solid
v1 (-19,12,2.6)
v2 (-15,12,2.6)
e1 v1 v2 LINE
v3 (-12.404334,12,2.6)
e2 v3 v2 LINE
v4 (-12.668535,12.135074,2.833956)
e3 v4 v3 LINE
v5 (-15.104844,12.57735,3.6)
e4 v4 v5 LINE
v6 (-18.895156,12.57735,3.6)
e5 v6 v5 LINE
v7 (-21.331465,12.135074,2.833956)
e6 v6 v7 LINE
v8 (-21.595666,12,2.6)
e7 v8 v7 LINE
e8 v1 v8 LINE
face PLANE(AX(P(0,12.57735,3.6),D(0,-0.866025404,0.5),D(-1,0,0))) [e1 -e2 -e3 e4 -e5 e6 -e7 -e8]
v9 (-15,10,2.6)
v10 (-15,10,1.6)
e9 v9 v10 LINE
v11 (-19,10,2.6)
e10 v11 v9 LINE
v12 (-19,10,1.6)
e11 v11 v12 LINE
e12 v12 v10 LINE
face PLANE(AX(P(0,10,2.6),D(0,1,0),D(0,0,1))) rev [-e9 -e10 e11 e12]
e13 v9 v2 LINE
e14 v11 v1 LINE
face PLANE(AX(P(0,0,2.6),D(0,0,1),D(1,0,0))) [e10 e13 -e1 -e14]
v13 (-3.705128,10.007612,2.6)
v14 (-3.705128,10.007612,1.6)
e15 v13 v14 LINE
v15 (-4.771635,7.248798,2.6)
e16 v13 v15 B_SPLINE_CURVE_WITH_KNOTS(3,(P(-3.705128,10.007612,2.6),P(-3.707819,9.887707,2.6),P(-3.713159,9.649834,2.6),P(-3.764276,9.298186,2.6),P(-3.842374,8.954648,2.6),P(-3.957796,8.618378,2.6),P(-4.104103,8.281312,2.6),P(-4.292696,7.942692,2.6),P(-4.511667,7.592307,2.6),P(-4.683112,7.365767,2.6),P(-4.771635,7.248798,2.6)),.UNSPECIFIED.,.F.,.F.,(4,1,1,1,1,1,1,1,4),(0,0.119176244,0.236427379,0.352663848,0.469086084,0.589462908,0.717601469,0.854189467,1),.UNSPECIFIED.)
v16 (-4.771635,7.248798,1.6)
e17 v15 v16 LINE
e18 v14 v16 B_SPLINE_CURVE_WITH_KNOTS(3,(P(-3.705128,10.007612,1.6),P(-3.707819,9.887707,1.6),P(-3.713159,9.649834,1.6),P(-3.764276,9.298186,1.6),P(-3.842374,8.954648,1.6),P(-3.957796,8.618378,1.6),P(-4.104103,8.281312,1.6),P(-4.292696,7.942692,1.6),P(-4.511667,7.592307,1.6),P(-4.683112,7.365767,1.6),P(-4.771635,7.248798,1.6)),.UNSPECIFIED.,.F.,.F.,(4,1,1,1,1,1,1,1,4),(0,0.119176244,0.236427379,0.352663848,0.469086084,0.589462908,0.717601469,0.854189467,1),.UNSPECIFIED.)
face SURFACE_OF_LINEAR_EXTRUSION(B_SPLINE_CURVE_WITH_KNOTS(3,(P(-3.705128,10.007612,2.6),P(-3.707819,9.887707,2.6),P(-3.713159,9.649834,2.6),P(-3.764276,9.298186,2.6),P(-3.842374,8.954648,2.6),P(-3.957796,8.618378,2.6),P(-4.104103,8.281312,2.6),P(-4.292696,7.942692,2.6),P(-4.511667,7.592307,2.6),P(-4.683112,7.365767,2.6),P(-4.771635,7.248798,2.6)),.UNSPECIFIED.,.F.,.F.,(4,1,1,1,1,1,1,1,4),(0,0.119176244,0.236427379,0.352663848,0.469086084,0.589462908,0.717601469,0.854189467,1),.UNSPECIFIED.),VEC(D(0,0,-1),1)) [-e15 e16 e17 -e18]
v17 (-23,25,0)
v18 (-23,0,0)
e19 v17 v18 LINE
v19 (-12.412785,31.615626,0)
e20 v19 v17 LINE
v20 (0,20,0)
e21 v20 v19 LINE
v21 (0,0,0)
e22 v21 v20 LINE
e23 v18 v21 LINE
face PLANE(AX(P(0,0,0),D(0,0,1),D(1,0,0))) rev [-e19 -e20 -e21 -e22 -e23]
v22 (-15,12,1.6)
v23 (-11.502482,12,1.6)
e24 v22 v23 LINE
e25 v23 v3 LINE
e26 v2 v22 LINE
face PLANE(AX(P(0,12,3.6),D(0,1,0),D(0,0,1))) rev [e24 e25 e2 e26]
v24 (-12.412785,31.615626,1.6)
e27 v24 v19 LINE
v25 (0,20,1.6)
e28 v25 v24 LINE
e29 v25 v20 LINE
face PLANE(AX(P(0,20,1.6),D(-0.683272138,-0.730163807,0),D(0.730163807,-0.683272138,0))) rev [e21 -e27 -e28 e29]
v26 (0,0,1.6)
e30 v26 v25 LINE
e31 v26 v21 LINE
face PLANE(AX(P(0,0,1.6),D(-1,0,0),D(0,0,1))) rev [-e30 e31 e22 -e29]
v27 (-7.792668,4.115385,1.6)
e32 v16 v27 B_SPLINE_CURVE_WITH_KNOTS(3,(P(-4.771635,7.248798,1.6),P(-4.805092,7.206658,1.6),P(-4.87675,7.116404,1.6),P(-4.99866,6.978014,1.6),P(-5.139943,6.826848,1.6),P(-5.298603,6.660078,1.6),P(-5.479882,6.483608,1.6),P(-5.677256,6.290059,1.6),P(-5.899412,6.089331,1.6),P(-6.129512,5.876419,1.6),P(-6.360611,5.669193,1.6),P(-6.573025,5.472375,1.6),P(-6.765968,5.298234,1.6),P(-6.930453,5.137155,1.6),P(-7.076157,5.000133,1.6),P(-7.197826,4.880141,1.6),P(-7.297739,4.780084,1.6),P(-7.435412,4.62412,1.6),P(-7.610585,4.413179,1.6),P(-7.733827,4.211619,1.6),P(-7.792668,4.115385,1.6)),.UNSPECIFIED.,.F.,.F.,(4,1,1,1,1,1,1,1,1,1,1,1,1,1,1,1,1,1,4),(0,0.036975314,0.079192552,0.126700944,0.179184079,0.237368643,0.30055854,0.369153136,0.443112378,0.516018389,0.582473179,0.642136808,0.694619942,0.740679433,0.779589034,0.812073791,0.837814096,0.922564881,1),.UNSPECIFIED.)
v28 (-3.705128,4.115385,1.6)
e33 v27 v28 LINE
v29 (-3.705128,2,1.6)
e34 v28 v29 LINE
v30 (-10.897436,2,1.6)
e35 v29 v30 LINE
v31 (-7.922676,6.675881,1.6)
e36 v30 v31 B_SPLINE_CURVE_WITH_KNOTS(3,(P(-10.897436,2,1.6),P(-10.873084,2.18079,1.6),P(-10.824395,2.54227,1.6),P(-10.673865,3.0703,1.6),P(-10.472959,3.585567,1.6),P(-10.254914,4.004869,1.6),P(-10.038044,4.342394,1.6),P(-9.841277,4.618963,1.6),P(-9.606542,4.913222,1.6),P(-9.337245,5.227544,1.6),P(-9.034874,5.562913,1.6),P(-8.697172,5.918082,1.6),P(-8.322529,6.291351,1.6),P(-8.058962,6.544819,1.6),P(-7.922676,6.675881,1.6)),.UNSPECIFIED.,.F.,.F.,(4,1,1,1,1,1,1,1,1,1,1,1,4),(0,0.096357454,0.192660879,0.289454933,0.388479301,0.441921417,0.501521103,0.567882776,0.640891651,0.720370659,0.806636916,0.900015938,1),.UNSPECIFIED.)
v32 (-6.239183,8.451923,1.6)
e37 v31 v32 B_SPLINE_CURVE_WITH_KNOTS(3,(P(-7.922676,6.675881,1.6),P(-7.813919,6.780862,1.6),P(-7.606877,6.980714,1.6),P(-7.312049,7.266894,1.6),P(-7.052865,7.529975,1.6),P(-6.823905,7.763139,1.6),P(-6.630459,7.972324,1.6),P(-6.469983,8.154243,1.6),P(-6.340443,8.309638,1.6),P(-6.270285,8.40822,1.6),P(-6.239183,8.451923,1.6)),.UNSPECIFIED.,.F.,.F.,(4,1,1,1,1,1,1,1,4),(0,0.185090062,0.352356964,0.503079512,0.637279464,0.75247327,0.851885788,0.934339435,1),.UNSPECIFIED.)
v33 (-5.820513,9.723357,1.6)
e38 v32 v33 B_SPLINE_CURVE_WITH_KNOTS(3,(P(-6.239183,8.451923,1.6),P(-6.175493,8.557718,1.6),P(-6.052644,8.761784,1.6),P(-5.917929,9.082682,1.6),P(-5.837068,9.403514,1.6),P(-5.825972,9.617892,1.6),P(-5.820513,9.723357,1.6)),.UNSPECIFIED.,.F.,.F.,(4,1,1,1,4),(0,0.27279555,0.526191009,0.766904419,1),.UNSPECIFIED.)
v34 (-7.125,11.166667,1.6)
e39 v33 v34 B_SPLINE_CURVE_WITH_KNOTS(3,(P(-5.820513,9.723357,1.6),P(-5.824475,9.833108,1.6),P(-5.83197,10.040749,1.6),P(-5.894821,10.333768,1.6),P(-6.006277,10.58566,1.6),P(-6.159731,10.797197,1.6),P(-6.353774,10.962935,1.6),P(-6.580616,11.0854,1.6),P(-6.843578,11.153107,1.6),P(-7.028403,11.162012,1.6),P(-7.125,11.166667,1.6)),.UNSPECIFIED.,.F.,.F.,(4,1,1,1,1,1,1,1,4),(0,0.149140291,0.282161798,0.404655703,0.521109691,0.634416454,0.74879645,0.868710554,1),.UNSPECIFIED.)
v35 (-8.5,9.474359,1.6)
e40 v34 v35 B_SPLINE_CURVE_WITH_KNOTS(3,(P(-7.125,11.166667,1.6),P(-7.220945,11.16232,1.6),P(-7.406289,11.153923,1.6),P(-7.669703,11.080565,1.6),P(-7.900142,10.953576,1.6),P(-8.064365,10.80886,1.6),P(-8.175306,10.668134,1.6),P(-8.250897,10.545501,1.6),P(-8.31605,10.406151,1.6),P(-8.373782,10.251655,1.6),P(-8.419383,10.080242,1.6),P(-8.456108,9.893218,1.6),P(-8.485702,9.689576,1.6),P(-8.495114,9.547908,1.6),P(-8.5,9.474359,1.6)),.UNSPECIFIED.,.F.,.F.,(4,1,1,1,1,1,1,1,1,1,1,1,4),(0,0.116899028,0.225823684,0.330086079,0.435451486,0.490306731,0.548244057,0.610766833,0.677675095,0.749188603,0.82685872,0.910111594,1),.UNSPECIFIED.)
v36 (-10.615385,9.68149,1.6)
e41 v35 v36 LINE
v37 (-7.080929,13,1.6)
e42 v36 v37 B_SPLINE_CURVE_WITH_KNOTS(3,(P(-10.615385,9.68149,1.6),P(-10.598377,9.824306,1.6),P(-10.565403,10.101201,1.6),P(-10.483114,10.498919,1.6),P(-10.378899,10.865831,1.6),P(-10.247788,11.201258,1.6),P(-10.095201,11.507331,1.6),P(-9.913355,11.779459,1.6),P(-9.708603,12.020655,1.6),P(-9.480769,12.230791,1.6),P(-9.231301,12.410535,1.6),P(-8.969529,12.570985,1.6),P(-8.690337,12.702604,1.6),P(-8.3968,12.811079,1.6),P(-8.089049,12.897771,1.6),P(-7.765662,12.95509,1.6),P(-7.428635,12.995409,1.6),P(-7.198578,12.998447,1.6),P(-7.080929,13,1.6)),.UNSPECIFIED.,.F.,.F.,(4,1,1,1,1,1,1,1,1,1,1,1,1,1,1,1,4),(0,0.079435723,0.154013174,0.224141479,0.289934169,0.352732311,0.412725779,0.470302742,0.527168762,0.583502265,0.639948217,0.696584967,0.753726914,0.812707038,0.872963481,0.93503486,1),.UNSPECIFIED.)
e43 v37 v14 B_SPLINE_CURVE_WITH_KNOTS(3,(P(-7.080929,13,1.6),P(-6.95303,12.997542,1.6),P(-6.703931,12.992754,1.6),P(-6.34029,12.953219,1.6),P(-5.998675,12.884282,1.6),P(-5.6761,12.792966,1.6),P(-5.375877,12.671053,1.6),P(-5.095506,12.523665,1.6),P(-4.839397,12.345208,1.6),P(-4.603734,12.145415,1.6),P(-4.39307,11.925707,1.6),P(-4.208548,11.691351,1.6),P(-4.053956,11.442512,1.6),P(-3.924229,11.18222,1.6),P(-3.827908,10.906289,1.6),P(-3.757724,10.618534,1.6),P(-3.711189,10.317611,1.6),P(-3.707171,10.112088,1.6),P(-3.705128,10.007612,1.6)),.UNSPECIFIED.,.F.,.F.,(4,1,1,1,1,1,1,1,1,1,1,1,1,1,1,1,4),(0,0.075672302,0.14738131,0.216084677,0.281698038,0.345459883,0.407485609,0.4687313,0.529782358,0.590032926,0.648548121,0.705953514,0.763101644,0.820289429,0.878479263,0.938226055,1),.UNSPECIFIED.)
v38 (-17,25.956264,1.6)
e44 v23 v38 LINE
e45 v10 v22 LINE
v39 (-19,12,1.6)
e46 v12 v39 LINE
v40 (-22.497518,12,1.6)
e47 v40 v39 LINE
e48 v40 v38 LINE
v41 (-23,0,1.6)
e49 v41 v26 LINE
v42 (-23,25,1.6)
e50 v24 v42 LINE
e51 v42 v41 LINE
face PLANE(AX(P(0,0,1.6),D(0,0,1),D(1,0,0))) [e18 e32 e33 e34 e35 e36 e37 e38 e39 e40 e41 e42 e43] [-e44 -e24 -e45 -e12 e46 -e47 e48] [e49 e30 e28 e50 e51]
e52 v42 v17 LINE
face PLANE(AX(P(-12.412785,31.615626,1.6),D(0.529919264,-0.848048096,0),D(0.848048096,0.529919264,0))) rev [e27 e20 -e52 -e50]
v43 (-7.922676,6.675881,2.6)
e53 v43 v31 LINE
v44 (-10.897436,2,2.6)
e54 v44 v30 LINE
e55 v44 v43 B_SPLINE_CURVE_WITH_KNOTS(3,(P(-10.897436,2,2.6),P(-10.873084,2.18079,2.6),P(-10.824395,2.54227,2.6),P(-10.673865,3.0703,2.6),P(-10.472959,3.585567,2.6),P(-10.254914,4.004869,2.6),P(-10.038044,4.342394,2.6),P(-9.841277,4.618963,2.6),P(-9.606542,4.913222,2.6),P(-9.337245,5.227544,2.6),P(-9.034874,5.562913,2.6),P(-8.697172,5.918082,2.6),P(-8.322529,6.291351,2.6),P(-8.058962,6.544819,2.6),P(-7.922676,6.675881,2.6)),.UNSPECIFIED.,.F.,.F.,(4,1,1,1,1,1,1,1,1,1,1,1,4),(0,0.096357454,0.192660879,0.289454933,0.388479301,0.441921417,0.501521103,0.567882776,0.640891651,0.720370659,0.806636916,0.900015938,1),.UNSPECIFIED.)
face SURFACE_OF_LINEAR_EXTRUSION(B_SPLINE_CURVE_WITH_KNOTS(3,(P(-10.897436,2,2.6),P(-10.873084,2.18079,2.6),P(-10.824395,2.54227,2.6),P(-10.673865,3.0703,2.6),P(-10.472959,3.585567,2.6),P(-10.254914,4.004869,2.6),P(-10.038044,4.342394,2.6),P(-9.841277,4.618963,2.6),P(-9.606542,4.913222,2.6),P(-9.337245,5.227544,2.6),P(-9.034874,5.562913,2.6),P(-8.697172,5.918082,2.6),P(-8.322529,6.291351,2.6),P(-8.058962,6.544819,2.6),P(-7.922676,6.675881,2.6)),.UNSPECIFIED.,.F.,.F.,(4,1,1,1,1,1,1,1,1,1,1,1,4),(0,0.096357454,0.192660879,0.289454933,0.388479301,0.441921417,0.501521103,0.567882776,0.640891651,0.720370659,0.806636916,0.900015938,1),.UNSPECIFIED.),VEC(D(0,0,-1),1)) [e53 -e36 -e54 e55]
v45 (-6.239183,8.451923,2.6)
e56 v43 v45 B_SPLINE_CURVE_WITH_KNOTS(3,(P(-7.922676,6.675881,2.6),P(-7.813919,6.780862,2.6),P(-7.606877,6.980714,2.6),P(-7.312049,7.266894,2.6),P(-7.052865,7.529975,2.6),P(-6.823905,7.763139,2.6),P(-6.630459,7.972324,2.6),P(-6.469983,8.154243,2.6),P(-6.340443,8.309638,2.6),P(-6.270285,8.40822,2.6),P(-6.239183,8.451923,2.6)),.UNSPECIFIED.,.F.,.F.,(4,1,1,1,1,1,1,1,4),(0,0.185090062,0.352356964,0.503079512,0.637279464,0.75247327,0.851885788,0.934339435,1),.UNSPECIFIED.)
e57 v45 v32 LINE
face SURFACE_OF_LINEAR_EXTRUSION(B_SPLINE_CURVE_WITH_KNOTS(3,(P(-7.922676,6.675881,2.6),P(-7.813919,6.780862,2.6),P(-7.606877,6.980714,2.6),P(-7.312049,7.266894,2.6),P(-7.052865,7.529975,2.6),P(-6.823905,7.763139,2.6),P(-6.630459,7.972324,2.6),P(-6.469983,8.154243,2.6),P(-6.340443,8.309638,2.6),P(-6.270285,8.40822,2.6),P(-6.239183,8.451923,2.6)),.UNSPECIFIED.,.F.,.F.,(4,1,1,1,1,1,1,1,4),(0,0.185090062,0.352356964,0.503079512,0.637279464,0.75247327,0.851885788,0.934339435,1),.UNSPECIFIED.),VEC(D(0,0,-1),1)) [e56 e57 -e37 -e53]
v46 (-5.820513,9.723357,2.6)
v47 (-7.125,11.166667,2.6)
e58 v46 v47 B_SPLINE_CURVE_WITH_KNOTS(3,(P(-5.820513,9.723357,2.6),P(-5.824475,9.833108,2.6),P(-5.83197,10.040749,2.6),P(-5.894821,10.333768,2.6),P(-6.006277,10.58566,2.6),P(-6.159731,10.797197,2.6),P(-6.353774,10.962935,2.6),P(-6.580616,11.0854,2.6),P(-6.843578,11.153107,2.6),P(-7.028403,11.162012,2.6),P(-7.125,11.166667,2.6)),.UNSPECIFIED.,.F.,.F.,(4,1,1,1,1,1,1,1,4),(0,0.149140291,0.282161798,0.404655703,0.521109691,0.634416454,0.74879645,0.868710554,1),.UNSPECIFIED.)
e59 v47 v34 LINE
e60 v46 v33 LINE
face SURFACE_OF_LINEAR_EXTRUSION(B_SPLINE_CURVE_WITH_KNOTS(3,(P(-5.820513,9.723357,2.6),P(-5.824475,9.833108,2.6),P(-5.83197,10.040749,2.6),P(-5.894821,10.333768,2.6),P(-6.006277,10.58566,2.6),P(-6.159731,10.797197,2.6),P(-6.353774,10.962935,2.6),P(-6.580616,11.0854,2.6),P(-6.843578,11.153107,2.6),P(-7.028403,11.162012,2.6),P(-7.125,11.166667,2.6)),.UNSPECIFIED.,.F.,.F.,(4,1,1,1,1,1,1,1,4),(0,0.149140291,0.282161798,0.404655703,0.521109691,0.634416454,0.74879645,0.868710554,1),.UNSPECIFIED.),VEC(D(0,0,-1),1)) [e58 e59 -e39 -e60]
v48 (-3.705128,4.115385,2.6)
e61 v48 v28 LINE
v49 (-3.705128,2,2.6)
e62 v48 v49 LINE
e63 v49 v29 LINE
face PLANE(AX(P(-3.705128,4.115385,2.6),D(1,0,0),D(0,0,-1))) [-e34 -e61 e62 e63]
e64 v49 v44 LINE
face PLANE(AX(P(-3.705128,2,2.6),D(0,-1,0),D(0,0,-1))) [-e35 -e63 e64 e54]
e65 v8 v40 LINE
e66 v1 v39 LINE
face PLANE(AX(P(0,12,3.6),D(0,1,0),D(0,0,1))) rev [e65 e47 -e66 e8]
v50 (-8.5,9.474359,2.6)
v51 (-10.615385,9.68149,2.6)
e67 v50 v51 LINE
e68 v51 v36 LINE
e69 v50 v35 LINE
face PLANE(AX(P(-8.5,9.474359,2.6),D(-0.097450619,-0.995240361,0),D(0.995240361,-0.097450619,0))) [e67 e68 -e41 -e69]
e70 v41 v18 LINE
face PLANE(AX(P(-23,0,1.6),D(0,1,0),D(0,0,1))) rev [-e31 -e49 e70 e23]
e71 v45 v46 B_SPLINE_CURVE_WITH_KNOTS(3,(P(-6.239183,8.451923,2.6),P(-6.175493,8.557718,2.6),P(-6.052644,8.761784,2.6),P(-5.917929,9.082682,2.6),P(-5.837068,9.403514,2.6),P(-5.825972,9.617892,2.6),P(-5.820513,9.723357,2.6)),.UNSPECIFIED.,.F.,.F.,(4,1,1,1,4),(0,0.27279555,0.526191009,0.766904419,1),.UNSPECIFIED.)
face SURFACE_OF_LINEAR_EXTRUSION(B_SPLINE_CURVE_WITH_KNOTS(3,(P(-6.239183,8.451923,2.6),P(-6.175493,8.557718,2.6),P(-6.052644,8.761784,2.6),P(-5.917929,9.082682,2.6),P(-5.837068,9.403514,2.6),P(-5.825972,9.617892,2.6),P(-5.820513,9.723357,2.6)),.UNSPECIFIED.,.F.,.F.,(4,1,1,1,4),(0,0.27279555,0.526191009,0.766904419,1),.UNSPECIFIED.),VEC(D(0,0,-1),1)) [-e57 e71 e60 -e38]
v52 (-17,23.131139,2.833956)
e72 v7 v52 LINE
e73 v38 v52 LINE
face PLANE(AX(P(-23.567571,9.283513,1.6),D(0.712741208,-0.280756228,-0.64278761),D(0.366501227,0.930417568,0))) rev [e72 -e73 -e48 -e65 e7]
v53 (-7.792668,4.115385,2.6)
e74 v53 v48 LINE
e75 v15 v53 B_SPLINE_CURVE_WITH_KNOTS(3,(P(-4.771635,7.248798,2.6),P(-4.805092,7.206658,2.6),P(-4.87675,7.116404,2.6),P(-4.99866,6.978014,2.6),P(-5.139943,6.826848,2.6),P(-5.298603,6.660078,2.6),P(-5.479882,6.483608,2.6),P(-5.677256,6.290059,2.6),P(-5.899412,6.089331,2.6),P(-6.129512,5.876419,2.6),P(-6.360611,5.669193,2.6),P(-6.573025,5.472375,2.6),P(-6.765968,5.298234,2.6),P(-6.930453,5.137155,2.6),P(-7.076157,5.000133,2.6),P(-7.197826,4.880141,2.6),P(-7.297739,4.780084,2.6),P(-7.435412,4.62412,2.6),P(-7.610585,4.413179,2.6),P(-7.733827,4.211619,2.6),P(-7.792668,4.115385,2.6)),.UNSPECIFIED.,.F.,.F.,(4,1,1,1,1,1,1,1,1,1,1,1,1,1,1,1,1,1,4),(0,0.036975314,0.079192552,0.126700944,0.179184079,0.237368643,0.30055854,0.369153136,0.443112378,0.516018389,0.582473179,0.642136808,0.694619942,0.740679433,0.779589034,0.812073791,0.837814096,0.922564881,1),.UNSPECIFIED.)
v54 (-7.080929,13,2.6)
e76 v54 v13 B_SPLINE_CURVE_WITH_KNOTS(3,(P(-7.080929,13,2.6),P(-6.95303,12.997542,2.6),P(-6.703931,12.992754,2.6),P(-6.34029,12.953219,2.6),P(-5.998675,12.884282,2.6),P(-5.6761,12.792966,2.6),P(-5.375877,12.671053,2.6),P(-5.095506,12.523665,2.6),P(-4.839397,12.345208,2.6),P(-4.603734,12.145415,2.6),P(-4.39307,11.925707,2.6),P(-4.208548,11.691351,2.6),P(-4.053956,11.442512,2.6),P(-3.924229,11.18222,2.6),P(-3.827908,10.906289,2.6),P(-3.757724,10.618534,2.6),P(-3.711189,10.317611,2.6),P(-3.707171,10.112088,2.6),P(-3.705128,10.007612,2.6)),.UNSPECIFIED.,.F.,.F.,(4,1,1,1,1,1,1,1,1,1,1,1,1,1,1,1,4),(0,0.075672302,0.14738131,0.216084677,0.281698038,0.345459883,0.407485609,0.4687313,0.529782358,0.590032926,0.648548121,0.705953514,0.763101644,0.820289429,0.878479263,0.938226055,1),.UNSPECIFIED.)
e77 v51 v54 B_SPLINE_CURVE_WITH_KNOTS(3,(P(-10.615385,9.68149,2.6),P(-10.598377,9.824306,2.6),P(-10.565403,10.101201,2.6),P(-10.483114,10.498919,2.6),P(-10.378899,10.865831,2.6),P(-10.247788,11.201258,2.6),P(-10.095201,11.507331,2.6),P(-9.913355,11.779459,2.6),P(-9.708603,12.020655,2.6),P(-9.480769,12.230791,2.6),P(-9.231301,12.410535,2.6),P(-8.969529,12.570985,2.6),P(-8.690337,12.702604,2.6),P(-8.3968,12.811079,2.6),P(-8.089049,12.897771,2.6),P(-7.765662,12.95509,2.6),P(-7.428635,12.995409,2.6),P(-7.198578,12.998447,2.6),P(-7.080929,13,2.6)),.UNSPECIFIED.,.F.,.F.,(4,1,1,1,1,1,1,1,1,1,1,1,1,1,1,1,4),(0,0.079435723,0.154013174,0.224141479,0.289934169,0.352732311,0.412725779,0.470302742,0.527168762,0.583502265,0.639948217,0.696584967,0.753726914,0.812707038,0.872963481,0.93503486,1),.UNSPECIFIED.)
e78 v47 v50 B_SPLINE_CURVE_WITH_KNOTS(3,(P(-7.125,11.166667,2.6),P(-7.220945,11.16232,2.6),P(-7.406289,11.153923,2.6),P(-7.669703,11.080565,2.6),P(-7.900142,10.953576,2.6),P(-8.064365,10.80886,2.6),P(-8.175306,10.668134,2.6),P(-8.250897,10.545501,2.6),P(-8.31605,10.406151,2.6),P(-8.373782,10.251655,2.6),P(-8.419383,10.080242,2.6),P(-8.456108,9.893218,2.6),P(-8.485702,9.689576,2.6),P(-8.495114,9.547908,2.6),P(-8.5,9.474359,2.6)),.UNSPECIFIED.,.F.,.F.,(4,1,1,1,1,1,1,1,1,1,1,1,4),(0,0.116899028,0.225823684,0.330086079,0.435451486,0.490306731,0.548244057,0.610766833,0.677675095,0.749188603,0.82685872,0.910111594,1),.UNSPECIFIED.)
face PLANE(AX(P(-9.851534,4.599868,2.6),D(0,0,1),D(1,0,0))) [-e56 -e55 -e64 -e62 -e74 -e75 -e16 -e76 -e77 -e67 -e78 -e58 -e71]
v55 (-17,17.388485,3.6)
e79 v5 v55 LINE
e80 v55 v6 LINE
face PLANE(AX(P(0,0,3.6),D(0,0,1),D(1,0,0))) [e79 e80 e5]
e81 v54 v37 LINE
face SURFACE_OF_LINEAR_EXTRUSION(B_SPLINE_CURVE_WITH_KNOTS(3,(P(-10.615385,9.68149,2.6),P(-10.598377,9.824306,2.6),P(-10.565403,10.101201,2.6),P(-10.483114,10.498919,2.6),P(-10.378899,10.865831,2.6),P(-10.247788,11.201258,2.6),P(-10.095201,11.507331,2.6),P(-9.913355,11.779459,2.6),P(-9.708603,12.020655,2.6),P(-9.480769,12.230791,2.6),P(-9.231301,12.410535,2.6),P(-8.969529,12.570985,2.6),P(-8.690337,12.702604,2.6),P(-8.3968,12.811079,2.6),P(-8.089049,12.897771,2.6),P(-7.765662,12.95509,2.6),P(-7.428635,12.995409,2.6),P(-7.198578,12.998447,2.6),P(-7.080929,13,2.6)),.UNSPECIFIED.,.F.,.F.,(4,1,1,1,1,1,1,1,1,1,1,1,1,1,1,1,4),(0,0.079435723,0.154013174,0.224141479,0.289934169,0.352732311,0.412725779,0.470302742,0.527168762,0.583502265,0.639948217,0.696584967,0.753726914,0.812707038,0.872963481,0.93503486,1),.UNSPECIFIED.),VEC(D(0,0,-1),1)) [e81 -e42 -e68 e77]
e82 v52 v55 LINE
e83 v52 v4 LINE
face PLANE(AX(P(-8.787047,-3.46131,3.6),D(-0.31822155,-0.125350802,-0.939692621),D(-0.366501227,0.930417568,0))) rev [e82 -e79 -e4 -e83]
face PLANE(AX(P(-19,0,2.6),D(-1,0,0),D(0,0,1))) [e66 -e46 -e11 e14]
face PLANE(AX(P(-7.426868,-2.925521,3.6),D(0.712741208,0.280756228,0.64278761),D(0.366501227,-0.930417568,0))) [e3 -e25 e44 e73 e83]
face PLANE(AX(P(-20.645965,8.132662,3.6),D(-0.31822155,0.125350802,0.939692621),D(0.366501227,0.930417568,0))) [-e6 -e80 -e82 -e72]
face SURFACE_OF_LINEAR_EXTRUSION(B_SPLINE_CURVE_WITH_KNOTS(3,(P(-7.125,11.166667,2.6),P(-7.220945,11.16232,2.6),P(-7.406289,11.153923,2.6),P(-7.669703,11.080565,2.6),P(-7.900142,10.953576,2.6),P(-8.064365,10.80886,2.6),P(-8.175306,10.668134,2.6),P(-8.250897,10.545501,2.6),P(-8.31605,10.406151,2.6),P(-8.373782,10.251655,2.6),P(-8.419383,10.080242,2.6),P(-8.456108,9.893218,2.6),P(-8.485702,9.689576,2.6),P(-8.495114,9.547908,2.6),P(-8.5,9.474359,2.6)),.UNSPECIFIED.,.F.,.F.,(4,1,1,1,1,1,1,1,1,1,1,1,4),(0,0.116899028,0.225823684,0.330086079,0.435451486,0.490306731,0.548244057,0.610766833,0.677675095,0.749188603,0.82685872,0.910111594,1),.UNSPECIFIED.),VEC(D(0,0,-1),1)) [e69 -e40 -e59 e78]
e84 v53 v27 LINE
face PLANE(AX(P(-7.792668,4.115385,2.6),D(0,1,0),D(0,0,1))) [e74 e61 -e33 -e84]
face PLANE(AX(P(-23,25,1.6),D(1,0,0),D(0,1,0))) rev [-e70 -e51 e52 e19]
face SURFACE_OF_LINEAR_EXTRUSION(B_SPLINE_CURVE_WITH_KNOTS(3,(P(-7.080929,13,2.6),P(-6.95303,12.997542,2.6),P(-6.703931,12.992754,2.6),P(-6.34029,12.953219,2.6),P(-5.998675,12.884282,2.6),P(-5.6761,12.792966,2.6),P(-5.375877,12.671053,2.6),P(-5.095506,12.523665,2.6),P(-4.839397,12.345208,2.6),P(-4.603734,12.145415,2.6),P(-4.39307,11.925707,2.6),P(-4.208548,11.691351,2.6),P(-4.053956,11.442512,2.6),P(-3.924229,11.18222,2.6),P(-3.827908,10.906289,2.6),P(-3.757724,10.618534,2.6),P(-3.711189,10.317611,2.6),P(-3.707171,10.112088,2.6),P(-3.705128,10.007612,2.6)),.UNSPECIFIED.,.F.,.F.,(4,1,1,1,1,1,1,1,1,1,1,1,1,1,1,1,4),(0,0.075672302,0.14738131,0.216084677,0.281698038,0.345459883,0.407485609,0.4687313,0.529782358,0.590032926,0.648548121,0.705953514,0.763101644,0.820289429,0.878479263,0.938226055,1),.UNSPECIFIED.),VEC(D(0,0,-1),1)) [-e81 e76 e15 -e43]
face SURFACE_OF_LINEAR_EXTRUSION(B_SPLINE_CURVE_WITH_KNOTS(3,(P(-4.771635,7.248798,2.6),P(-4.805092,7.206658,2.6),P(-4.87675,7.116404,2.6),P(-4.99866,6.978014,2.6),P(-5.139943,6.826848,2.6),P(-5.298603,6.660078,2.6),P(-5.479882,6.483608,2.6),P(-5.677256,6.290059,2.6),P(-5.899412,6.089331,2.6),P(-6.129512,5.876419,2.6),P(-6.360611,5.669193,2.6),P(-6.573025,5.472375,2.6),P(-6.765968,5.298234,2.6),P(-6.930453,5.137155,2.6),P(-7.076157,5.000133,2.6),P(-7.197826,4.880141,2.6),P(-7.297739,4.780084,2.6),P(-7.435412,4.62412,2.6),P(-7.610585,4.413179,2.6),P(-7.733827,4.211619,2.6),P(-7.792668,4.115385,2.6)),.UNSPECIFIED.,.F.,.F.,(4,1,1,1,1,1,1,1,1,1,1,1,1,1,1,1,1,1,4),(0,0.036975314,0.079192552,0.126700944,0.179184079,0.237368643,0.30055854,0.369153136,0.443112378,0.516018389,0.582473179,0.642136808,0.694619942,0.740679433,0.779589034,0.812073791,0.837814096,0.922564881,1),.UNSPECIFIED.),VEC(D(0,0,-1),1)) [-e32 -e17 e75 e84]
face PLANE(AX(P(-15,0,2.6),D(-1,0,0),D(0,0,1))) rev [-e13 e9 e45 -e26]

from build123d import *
from OCP.BRepFilletAPI import BRepFilletAPI_MakeChamfer

# Parameters (mm, degrees)
P_IDAT_VYSUNUT_M5_DEPTH = 1.6
P_IDAT_VYSUNUT_M6_DEPTH = 2
SKICA2_7_W              = 2
SKICA2_7_H              = 2
P_IDAT_VYSUNUT_M7_DEPTH = 1
P_IDAT_VYSUNUT_M8_DEPTH = 1
ZKOSEN_5_SIZE2          = 1.678199262
ZKOSEN_5_SIZE           = 2
ZKOSEN_8_SIZE2          = 2
ZKOSEN_8_SIZE           = 1.678199262
ZKOSEN_12_SIZE          = 1.461883237
ZKOSEN_12_SIZE_2        = 1
ZKOSEN_12_SIZE_3        = 0.577350269


with BuildPart() as part:
    # Skica1 → Přidat vysunutím5 (new body)
    with BuildSketch(Plane.XY):
        Polygon((0, 0), (0, 20), (-12.412784718, 31.615626352), (-23, 25), (-23, 0), align=None)
    extrude(amount=P_IDAT_VYSUNUT_M5_DEPTH)

    # Skica2 → Přidat vysunutím6 (add)
    with BuildSketch(Plane.XY.offset(1.6)):
        Polygon((-17, 25.95626352), (-17, 12), (-15, 12), (-11.502481599, 12), align=None)
        Polygon((-22.497518401, 12), (-19, 12), (-17, 12), (-17, 25.95626352), align=None)
    extrude(amount=P_IDAT_VYSUNUT_M6_DEPTH)

    # Skica2<7> → Přidat vysunutím7 (add)
    with BuildSketch(Plane.XY.offset(1.6)):
        with Locations((-16, 11)):
            Rectangle(SKICA2_7_W, SKICA2_7_H)
        with Locations((-18, 11)):
            Rectangle(SKICA2_7_W, SKICA2_7_H)
    extrude(amount=P_IDAT_VYSUNUT_M7_DEPTH)

    # Skica3 → Přidat vysunutím8 (add)
    with BuildSketch(Plane.XY.offset(1.6)):
        with BuildLine():
            Line((-3.705128205, 4.115384615), (-3.705128205, 2))
            Line((-3.705128205, 2), (-10.897435897, 2))
            add(Edge.make_bspline(
                [(-10.897435897, 2), (-10.87308441, 2.180790308), (-10.824395089, 2.542269551), (-10.673865117, 3.070299742), (-10.472959166, 3.585566992), (-10.254913916, 4.004869463), (-10.038043764, 4.342393523), (-9.841277463, 4.618963346), (-9.60654249, 4.913221767), (-9.337245105, 5.227544267), (-9.034873554, 5.562913411), (-8.697171951, 5.918082368), (-8.322529407, 6.291350846), (-8.058961705, 6.54481851), (-7.922676282, 6.67588141)],
                knots=[0, 0, 0, 0, 1.156289446, 2.311930546, 3.473459201, 4.661751613, 5.303057008, 6.018253237, 6.81459331, 7.690699809, 8.644447906, 9.679642995, 10.800191253, 12, 12, 12, 12], degree=3))
            add(Edge.make_bspline(
                [(-7.922676282, 6.67588141), (-7.813918956, 6.780862005), (-7.606877039, 6.980714138), (-7.312048947, 7.266894293), (-7.052864674, 7.529975199), (-6.823905036, 7.763139303), (-6.630459323, 7.972323552), (-6.469982936, 8.154242742), (-6.34044346, 8.309637702), (-6.270284768, 8.408220362), (-6.239182692, 8.451923077)],
                knots=[0, 0, 0, 0, 1.480720495, 2.818855715, 4.024636094, 5.098235712, 6.019786162, 6.815086302, 7.474715479, 8, 8, 8, 8], degree=3))
            add(Edge.make_bspline(
                [(-6.239182692, 8.451923077), (-6.175493233, 8.557718073), (-6.052643645, 8.761784362), (-5.91792888, 9.082682292), (-5.837068057, 9.403513936), (-5.825971765, 9.617891805), (-5.820512821, 9.723357372)],
                knots=[0, 0, 0, 0, 1.0911822, 2.104764037, 3.067617678, 4, 4, 4, 4], degree=3))
            add(Edge.make_bspline(
                [(-5.820512821, 9.723357372), (-5.824474653, 9.833108474), (-5.831970132, 10.040748999), (-5.894821019, 10.333768175), (-6.006276867, 10.585659667), (-6.15973106, 10.797196661), (-6.353774193, 10.962935085), (-6.580616259, 11.085399693), (-6.843577862, 11.153106661), (-7.028402789, 11.16201224), (-7.125, 11.166666667)],
                knots=[0, 0, 0, 0, 1.193122327, 2.257294386, 3.237245624, 4.168877528, 5.075331632, 5.990371598, 6.949684428, 8, 8, 8, 8], degree=3))
            add(Edge.make_bspline(
                [(-7.125, 11.166666667), (-7.220944609, 11.16231978), (-7.406288878, 11.153922533), (-7.669703299, 11.080565334), (-7.900142302, 10.953576306), (-8.06436539, 10.808860058), (-8.175305876, 10.668134018), (-8.250896853, 10.545500545), (-8.316050374, 10.406151312), (-8.37378183, 10.251655158), (-8.419383153, 10.080242168), (-8.456107626, 9.893217825), (-8.485702239, 9.689575671), (-8.495113848, 9.547907653), (-8.5, 9.474358974)],
                knots=[0, 0, 0, 0, 1.402788338, 2.709884207, 3.961032948, 5.225417836, 5.883680772, 6.578928686, 7.329201998, 8.132101139, 8.990263233, 9.922304639, 10.921339128, 12, 12, 12, 12], degree=3))
            Line((-8.5, 9.474358974), (-10.615384615, 9.681490385))
            add(Edge.make_bspline(
                [(-10.615384615, 9.681490385), (-10.598377251, 9.824305509), (-10.565402688, 10.101201217), (-10.483114114, 10.498918926), (-10.378898684, 10.865831465), (-10.247788098, 11.201257911), (-10.095201314, 11.507331251), (-9.913355139, 11.779458664), (-9.708603468, 12.020654551), (-9.480769352, 12.230790543), (-9.231301205, 12.410535137), (-8.969529148, 12.57098477), (-8.690337423, 12.702604473), (-8.396799939, 12.811078884), (-8.089049352, 12.897770766), (-7.765662274, 12.955090263), (-7.42863453, 12.995409017), (-7.198577984, 12.998446608), (-7.080929487, 13)],
                knots=[0, 0, 0, 0, 1.270971563, 2.464210789, 3.586263665, 4.638946707, 5.643716971, 6.603612468, 7.52484387, 8.434700188, 9.336036235, 10.239171475, 11.145359471, 12.059630629, 13.003312604, 13.96741569, 14.960557767, 16, 16, 16, 16], degree=3))
            add(Edge.make_bspline(
                [(-7.080929487, 13), (-6.953030371, 12.997541845), (-6.703930784, 12.992754281), (-6.34028961, 12.953218534), (-5.998674853, 12.884282231), (-5.676099879, 12.79296634), (-5.375877361, 12.67105295), (-5.095505554, 12.52366473), (-4.83939702, 12.345207999), (-4.603734114, 12.145414763), (-4.393070332, 11.925706984), (-4.20854792, 11.691351493), (-4.053955652, 11.442511564), (-3.924228998, 11.182220281), (-3.827907833, 10.90628918), (-3.757724044, 10.618533633), (-3.711189366, 10.317611197), (-3.707170936, 10.112088), (-3.705128205, 10.007612179)],
                knots=[0, 0, 0, 0, 1.210756838, 2.35810096, 3.457354827, 4.507168606, 5.527358126, 6.519769748, 7.499700793, 8.476517721, 9.440526811, 10.376769937, 11.295256217, 12.209626307, 13.124630862, 14.055668209, 15.011616881, 16, 16, 16, 16], degree=3))
            add(Edge.make_bspline(
                [(-3.705128205, 10.007612179), (-3.707819477, 9.887707131), (-3.713158546, 9.649833916), (-3.764276175, 9.298186238), (-3.84237396, 8.954647512), (-3.957796338, 8.618378159), (-4.104103161, 8.28131186), (-4.292696164, 7.942692037), (-4.511666905, 7.592306518), (-4.683112364, 7.36576699), (-4.771634615, 7.248798077)],
                knots=[0, 0, 0, 0, 0.953409949, 1.89141903, 2.821310783, 3.752688675, 4.715703262, 5.740811754, 6.833515735, 8, 8, 8, 8], degree=3))
            add(Edge.make_bspline(
                [(-4.771634615, 7.248798077), (-4.80509214, 7.206658226), (-4.876750403, 7.116404431), (-4.998659939, 6.978014195), (-5.139942605, 6.826848432), (-5.298602846, 6.660077667), (-5.479881522, 6.483607708), (-5.677256214, 6.290058721), (-5.899411985, 6.089331377), (-6.12951153, 5.876418507), (-6.360611244, 5.669193404), (-6.5730252, 5.472375498), (-6.765967752, 5.298233923), (-6.930453202, 5.137155265), (-7.076156545, 5.000133027), (-7.197826149, 4.880140867), (-7.29773874, 4.780083699), (-7.43541186, 4.624119958), (-7.610585282, 4.413178934), (-7.733826947, 4.21161882), (-7.792668269, 4.115384615)],
                knots=[0, 0, 0, 0, 0.665555651, 1.425465941, 2.280616993, 3.225313414, 4.272635571, 5.410053715, 6.644756443, 7.976022804, 9.288331007, 10.484517221, 11.558462543, 12.503158964, 13.33222979, 14.032602617, 14.617328242, 15.080653724, 16.606167857, 18, 18, 18, 18], degree=3))
            Line((-7.792668269, 4.115384615), (-3.705128205, 4.115384615))
        make_face()
    extrude(amount=P_IDAT_VYSUNUT_M8_DEPTH)

    # Zkosení5
    zkosen_5_edges = [part.edges().sort_by_distance(p)[0] for p in [
        (-14.2512408, 18.97813176, 3.6),
    ]]
    zkosen_5_side = [part.faces().sort_by_distance(p)[0] for p in [
        (-14.2512408, 18.97813176, 3.566436015),
    ]]
    chamfer(zkosen_5_edges, length=ZKOSEN_5_SIZE - 0.0001, length2=ZKOSEN_5_SIZE2 - 0.0001, reference=zkosen_5_side[0])  # a hair under: the kernel refuses the full size

    # Zkosení8
    zkosen_8_edges = [part.edges().sort_by_distance(p)[0] for p in [
        (-20.1996587, 17.833456695, 3.6),
    ]]
    zkosen_8_side = [part.faces().sort_by_distance(p)[0] for p in [
        (-20.168430178, 17.821155453, 3.6),
    ]]
    chamfer(zkosen_8_edges, length=ZKOSEN_8_SIZE - 0.0001, length2=ZKOSEN_8_SIZE2 - 0.0001, reference=zkosen_8_side[0])  # a hair under: the kernel refuses the full size

    # Zkosení12
    zkosen_12_edges_1 = [part.edges().sort_by_distance(p)[0] for p in [
        (-15.153039798, 16.68878163, 3.6),
    ]]
    zkosen_12_side_1 = [part.faces().sort_by_distance(p)[0] for p in [
        (-15.171648149, 16.681451605, 3.6),
    ]]
    zkosen_12_edges_2 = [part.edges().sort_by_distance(p)[0] for p in [
        (-17, 12, 3.6),
    ]]
    zkosen_12_side_2 = [part.faces().sort_by_distance(p)[0] for p in [
        (-17, 12, 3.588452995),
    ]]
    zkosen_12_edges_3 = [part.edges().sort_by_distance(p)[0] for p in [
        (-18.846960202, 16.68878163, 3.6),
    ]]
    zkosen_12_side_3 = [part.faces().sort_by_distance(p)[0] for p in [
        (-18.828351851, 16.681451605, 3.6),
    ]]
    zkosen_12 = BRepFilletAPI_MakeChamfer(part.part.solid().wrapped)
    for e in zkosen_12_edges_1:
        zkosen_12.Add(ZKOSEN_12_SIZE - 0.0001, ZKOSEN_12_SIZE_2 - 0.0001, e.wrapped, zkosen_12_side_1[0].wrapped)
    for e in zkosen_12_edges_2:
        zkosen_12.Add(ZKOSEN_12_SIZE_2 - 0.0001, ZKOSEN_12_SIZE_3 - 0.0001, e.wrapped, zkosen_12_side_2[0].wrapped)
    for e in zkosen_12_edges_3:
        zkosen_12.Add(ZKOSEN_12_SIZE - 0.0001, ZKOSEN_12_SIZE_2 - 0.0001, e.wrapped, zkosen_12_side_3[0].wrapped)
    add(Compound.cast(zkosen_12.Shape()), mode=Mode.REPLACE)  # a hair under: the kernel refuses the full size


solid = part.part
